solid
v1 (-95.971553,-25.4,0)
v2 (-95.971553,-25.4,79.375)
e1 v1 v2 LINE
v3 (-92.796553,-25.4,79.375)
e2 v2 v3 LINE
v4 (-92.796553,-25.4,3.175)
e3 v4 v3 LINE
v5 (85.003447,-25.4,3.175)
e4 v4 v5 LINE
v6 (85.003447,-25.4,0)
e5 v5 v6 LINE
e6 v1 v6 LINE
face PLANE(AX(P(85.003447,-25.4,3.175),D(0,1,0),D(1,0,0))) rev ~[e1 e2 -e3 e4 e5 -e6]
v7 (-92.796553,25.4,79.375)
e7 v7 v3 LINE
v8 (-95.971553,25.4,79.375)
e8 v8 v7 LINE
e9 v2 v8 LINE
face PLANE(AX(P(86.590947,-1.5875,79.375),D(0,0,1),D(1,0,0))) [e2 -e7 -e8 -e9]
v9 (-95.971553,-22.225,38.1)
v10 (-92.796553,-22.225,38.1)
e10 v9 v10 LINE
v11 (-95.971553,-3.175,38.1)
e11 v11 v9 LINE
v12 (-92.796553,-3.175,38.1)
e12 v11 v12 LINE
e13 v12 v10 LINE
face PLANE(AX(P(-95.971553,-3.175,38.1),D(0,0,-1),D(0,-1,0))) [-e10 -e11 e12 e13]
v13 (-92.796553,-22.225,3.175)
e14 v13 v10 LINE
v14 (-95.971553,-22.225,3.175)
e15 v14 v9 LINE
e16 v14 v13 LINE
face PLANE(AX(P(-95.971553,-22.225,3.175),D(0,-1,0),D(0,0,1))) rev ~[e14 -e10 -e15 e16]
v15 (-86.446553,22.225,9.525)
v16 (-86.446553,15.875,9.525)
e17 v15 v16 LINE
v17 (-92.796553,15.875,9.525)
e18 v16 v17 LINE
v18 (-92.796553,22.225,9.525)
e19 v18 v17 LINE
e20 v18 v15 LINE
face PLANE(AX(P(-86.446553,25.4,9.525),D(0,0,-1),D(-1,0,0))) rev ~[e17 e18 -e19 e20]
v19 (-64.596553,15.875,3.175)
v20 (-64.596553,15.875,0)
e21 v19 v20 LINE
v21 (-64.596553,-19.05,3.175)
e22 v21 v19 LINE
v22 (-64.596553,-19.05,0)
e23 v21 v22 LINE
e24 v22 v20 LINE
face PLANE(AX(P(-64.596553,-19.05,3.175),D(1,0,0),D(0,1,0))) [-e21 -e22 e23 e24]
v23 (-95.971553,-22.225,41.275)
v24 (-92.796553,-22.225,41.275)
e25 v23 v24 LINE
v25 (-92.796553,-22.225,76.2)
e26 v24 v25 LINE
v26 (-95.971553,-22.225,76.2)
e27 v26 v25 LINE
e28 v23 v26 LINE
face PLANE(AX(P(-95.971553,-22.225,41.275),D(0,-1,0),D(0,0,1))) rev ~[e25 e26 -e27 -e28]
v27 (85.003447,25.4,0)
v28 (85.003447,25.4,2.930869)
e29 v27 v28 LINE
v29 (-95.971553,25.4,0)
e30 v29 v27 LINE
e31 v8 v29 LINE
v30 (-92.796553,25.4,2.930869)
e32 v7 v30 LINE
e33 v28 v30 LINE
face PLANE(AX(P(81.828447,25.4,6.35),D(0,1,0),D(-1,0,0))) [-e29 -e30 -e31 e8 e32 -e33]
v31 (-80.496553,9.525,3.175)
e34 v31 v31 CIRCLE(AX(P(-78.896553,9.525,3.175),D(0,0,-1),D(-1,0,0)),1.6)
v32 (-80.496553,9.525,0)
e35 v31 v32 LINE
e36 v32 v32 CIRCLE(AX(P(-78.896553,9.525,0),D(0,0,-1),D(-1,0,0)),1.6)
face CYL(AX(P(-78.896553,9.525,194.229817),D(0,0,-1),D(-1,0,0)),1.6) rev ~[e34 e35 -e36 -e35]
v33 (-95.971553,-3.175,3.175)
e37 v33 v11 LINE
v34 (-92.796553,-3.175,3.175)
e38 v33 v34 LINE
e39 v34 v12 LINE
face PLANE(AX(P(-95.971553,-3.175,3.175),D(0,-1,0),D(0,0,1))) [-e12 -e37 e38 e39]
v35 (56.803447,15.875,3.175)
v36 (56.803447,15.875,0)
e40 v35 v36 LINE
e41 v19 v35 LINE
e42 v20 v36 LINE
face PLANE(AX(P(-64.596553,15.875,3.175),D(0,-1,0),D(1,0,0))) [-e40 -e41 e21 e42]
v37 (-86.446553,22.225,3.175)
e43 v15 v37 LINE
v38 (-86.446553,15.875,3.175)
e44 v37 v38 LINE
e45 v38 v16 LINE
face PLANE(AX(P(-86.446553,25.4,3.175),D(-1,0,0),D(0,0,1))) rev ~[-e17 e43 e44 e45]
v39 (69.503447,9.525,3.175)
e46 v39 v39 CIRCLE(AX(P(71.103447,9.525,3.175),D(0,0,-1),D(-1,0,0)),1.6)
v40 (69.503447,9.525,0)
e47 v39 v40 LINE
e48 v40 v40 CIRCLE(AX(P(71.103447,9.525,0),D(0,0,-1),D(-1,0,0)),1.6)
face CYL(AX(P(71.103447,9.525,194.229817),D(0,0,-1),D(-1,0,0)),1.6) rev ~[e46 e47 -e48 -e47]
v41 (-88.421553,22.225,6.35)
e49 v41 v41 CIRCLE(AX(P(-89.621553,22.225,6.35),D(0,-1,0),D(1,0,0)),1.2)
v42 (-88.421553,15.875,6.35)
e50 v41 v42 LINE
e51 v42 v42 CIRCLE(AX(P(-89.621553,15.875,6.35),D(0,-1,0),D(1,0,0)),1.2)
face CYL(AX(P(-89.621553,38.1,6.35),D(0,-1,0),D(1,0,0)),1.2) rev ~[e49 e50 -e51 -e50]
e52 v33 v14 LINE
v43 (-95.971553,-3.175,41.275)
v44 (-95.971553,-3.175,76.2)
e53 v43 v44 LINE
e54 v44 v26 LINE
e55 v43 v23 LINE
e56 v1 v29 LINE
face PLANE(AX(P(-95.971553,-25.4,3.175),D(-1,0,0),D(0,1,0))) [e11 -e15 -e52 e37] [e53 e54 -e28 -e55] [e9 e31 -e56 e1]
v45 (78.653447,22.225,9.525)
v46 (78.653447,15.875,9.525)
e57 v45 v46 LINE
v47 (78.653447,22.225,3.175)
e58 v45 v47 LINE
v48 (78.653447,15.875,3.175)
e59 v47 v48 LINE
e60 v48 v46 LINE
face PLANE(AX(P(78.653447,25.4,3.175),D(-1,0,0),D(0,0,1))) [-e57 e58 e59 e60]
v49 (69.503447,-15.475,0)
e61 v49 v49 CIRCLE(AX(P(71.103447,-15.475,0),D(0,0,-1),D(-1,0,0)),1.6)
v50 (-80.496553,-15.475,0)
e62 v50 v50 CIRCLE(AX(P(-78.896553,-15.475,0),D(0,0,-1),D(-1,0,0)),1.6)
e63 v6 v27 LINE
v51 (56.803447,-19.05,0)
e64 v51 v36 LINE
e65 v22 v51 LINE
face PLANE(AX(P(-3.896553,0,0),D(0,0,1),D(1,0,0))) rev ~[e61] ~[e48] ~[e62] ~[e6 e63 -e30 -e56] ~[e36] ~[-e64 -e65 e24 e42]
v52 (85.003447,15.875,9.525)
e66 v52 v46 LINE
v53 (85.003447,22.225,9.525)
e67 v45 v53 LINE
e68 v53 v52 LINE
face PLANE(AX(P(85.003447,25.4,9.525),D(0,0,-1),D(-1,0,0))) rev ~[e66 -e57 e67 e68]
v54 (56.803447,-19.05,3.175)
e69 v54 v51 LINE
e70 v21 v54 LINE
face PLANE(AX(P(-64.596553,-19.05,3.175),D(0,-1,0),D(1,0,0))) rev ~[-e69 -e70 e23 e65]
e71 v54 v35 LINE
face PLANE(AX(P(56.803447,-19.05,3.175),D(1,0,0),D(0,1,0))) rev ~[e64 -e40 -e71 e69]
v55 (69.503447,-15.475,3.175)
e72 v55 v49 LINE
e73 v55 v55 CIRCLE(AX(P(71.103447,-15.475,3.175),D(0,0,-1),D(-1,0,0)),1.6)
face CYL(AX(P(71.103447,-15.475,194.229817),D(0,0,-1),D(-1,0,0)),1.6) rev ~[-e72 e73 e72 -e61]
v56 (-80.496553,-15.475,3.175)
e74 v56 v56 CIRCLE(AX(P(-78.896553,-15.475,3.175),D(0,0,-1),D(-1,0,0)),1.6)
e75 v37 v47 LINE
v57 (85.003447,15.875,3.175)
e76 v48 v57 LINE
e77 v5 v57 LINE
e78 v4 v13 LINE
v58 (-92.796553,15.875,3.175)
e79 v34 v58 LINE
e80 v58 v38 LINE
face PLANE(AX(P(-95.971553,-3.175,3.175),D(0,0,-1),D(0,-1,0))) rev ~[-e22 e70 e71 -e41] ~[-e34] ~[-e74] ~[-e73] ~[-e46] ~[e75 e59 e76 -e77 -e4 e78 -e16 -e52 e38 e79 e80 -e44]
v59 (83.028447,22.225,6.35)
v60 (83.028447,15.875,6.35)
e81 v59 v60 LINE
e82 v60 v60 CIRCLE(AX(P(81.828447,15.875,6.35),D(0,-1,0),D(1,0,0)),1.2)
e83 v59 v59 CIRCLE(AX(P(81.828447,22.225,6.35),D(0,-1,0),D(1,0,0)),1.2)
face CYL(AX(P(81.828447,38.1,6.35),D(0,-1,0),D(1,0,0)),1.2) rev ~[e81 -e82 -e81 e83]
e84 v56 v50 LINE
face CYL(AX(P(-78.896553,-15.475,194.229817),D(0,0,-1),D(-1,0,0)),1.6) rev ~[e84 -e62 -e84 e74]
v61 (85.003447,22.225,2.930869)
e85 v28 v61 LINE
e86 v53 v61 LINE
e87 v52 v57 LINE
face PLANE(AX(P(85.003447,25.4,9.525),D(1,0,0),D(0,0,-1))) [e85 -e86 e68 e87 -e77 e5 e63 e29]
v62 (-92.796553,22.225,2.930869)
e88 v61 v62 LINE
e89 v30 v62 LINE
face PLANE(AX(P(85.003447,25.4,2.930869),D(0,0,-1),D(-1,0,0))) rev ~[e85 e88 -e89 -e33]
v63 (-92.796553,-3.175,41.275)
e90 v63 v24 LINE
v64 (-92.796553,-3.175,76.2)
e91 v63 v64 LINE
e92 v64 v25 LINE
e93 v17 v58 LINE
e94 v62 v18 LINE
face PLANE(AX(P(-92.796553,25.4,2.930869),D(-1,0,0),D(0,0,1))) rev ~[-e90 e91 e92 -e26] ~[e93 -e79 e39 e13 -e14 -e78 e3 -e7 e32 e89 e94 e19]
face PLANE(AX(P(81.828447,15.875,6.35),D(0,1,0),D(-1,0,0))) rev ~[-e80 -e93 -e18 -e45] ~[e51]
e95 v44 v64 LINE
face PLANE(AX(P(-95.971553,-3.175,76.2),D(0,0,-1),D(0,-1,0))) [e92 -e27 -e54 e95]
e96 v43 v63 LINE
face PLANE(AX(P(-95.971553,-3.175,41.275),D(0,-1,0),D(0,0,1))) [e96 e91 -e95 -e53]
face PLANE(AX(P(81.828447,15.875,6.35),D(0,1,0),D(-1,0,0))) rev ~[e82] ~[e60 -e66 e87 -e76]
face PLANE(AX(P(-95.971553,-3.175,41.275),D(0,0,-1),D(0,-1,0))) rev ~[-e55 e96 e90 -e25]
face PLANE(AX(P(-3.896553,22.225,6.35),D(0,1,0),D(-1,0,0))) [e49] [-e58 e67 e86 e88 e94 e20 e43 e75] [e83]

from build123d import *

# Parameters (mm, degrees)
F0_W      = 184.15
F0_H      = 50.8
F1_DEPTH  = 3.175
F3_D      = 3.2
F4_W      = 184.15
F4_H      = 3.175
F5_DEPTH  = 76.2
F7_D      = 3.3
F8_W      = 3.175
F8_H      = 47.625
F9_DEPTH  = 76.2
F10_W     = 19.05
F10_H     = 34.925
F11_DEPTH = 3.175
F12_W     = 3.175
F12_H     = 47.625
F13_DEPTH = 76.2
F14_W     = 13.2291666667
F14_H     = 31.75
F14_W_2   = 11.6416666667
F15_DEPTH = 3.175
F16_W     = 6.35
F16_H     = 6.35
F17_DEPTH = 6.35
F19_D     = 2.4
F19_DEPTH = 12.7
F19_TIP   = 0.7210327428
F20_W     = 121.4
F20_H     = 34.925
F21_DEPTH = 25.4
F22_W     = 60.2
F22_H     = 32.26
F23_DEPTH = 25.4
F24_W     = 177.8
F24_H     = 76.2
F25_DEPTH = 50.801
F26_W     = 6.35
F26_H     = 6.35
F27_DEPTH = 9.525
F28_D     = 2.4
F28_DEPTH = 12.7
F28_TIP   = 0.7210327428
F29_W     = 165.1
F29_H     = 6.35
F29_R     = 1.2
F30_DEPTH = 3.175


with BuildPart() as f1:
    # F0 (on Top) → F1 (new body)
    with BuildSketch(Plane.XY):
        with Locations((-3.8965528874, 0)):
            Rectangle(F0_W, F0_H)
    extrude(amount=F1_DEPTH)

    # F3 (through all)
    with Locations(Plane.XY.offset(3.175)):
        with Locations((-78.8965528874, 9.525), (-78.8965528874, -15.475), (71.1034471126, -15.475), (71.1034471126, 9.525)):
            Hole(F3_D / 2)

    # F4 (on face) → F5 (join)
    with BuildSketch(Plane.XY.offset(3.175)):
        with Locations((-3.8965528874, 23.8125)):
            Rectangle(F4_W, F4_H)
    extrude(amount=F5_DEPTH)

    # F7 (through all)
    with Locations(Plane.XZ.offset(-22.225)):
        with Locations((-70.5715528874, 66.675), (11.9784471126, 66.675), (10.7084471126, 18.415), (-64.2215528874, 18.415)):
            Hole(F7_D / 2)

    # F8 (on face) → F9 (join)
    with BuildSketch(Plane.XY.offset(3.175)):
        with Locations((-94.3840528874, -1.5875)):
            Rectangle(F8_W, F8_H)
    extrude(amount=F9_DEPTH)

    # F10 (on face) → F11 (cut, through all)
    with BuildSketch(Plane(origin=(-95.9715528874, 0, 0), x_dir=(0, -1, 0), z_dir=(-1, 0, 0))):
        with Locations((12.7, 58.7375)):
            Rectangle(F10_W, F10_H)
        with Locations((12.7, 20.6375)):
            Rectangle(F10_W, F10_H)
    extrude(amount=-F11_DEPTH, mode=Mode.SUBTRACT)

    # F12 (on face) → F13 (join)
    with BuildSketch(Plane.XY.offset(3.175)):
        with Locations((86.5909471126, -1.5875)):
            Rectangle(F12_W, F12_H)
    extrude(amount=F13_DEPTH)

    # F14 (on face) → F15 (cut, through all)
    with BuildSketch(Plane.YZ.offset(88.1784471126)):
        with Locations((-15.6104166667, 19.05)):
            Rectangle(F14_W, F14_H)
        with Locations((0, 19.05)):
            Rectangle(F14_W_2, F14_H)
        with Locations((15.6104166667, 19.05)):
            Rectangle(F14_W, F14_H)
    extrude(amount=-F15_DEPTH, mode=Mode.SUBTRACT)

    # F16 (on face) → F17 (join)
    with BuildSketch(Plane.XZ.offset(-22.225)):
        with Locations((-89.6215528874, 76.2)):
            Rectangle(F16_W, F16_H)
        with Locations((81.8284471126, 76.2)):
            Rectangle(F16_W, F16_H)
    extrude(amount=F17_DEPTH)

    # F19
    with Locations(Plane.XY.offset(79.375)):
        with Locations((-89.6215528874, 19.05), (81.8284471126, 19.05)):
            Hole(F19_D / 2, depth=F19_DEPTH)
            with Locations((0, 0, -(F19_DEPTH + F19_TIP / 2))):  # 118° drill point
                Cone(0, F19_D / 2, F19_TIP, mode=Mode.SUBTRACT)

    # F20 (on face) → F21 (cut)
    with BuildSketch(Plane.XY.offset(3.175)):
        with Locations((-3.8965528874, -1.5875)):
            Rectangle(F20_W, F20_H)
    extrude(amount=-F21_DEPTH, mode=Mode.SUBTRACT)

    # F22 (on face) → F23 (cut)
    with BuildSketch(Plane.XZ.offset(-22.225)):
        with Locations((-26.1215528874, 42.545)):
            Rectangle(F22_W, F22_H)
    extrude(amount=-F23_DEPTH, mode=Mode.SUBTRACT)

    # F24 (on face) → F25 (cut, through all)
    with BuildSketch(Plane.XZ.offset(25.4)):
        with Locations((-3.8965528874, 41.275)):
            Rectangle(F24_W, F24_H)
        Polygon((88.1784471126, 79.375), (85.0034471126, 79.375), (85.0034471126, 3.175), (85.0034471126, 0), (88.1784471126, 0), align=None)
    extrude(amount=-F25_DEPTH, mode=Mode.SUBTRACT)

    # F26 (on face) → F27 (join)
    with BuildSketch(Plane(origin=(0, 25.4, 0), x_dir=(-1, 0, 0), z_dir=(0, 1, 0))):
        with Locations((-81.8284471126, 6.35)):
            Rectangle(F26_W, F26_H)
        Polygon((-78.6534471126, 3.175), (-85.0034471126, 3.175), (-85.0034471126, 0), (95.9715528874, 0), (95.9715528874, 79.375), (92.7965528874, 79.375), (92.7965528874, 9.525), (92.7965528874, 3.175), (86.4465528874, 3.175), align=None)
        with Locations((89.6215528874, 6.35)):
            Rectangle(F26_W, F26_H)
    extrude(amount=-F27_DEPTH)

    # F28
    with Locations(Plane(origin=(0, 25.4, 0), x_dir=(-1, 0, 0), z_dir=(0, 1, 0))):
        with Locations((89.6215528874, 6.35), (-81.8284471126, 6.35)):
            Hole(F28_D / 2, depth=F28_DEPTH)
            with Locations((0, 0, -(F28_DEPTH + F28_TIP / 2))):  # 118° drill point
                Cone(0, F28_D / 2, F28_TIP, mode=Mode.SUBTRACT)

    # F29 (on face) → F30 (cut)
    with BuildSketch(Plane(origin=(0, 25.4, 0), x_dir=(-1, 0, 0), z_dir=(0, 1, 0))):
        with Locations((3.8965528874, 6.35)):
            Rectangle(F29_W, F29_H)
        Polygon((-78.6534471126, 9.525), (-85.0034471126, 9.525), (-85.0034471126, 2.9308686499), (92.7965528874, 2.9308686499), (92.7965528874, 9.525), (86.4465528874, 9.525), (86.4465528874, 3.175), (-78.6534471126, 3.175), align=None)
        with Locations((-81.8284471126, 6.35)):
            Circle(F29_R, mode=Mode.SUBTRACT)
        with Locations((89.6215528874, 6.35)):
            Circle(F29_R, mode=Mode.SUBTRACT)
    extrude(amount=-F30_DEPTH, mode=Mode.SUBTRACT)


solid = f1.part
